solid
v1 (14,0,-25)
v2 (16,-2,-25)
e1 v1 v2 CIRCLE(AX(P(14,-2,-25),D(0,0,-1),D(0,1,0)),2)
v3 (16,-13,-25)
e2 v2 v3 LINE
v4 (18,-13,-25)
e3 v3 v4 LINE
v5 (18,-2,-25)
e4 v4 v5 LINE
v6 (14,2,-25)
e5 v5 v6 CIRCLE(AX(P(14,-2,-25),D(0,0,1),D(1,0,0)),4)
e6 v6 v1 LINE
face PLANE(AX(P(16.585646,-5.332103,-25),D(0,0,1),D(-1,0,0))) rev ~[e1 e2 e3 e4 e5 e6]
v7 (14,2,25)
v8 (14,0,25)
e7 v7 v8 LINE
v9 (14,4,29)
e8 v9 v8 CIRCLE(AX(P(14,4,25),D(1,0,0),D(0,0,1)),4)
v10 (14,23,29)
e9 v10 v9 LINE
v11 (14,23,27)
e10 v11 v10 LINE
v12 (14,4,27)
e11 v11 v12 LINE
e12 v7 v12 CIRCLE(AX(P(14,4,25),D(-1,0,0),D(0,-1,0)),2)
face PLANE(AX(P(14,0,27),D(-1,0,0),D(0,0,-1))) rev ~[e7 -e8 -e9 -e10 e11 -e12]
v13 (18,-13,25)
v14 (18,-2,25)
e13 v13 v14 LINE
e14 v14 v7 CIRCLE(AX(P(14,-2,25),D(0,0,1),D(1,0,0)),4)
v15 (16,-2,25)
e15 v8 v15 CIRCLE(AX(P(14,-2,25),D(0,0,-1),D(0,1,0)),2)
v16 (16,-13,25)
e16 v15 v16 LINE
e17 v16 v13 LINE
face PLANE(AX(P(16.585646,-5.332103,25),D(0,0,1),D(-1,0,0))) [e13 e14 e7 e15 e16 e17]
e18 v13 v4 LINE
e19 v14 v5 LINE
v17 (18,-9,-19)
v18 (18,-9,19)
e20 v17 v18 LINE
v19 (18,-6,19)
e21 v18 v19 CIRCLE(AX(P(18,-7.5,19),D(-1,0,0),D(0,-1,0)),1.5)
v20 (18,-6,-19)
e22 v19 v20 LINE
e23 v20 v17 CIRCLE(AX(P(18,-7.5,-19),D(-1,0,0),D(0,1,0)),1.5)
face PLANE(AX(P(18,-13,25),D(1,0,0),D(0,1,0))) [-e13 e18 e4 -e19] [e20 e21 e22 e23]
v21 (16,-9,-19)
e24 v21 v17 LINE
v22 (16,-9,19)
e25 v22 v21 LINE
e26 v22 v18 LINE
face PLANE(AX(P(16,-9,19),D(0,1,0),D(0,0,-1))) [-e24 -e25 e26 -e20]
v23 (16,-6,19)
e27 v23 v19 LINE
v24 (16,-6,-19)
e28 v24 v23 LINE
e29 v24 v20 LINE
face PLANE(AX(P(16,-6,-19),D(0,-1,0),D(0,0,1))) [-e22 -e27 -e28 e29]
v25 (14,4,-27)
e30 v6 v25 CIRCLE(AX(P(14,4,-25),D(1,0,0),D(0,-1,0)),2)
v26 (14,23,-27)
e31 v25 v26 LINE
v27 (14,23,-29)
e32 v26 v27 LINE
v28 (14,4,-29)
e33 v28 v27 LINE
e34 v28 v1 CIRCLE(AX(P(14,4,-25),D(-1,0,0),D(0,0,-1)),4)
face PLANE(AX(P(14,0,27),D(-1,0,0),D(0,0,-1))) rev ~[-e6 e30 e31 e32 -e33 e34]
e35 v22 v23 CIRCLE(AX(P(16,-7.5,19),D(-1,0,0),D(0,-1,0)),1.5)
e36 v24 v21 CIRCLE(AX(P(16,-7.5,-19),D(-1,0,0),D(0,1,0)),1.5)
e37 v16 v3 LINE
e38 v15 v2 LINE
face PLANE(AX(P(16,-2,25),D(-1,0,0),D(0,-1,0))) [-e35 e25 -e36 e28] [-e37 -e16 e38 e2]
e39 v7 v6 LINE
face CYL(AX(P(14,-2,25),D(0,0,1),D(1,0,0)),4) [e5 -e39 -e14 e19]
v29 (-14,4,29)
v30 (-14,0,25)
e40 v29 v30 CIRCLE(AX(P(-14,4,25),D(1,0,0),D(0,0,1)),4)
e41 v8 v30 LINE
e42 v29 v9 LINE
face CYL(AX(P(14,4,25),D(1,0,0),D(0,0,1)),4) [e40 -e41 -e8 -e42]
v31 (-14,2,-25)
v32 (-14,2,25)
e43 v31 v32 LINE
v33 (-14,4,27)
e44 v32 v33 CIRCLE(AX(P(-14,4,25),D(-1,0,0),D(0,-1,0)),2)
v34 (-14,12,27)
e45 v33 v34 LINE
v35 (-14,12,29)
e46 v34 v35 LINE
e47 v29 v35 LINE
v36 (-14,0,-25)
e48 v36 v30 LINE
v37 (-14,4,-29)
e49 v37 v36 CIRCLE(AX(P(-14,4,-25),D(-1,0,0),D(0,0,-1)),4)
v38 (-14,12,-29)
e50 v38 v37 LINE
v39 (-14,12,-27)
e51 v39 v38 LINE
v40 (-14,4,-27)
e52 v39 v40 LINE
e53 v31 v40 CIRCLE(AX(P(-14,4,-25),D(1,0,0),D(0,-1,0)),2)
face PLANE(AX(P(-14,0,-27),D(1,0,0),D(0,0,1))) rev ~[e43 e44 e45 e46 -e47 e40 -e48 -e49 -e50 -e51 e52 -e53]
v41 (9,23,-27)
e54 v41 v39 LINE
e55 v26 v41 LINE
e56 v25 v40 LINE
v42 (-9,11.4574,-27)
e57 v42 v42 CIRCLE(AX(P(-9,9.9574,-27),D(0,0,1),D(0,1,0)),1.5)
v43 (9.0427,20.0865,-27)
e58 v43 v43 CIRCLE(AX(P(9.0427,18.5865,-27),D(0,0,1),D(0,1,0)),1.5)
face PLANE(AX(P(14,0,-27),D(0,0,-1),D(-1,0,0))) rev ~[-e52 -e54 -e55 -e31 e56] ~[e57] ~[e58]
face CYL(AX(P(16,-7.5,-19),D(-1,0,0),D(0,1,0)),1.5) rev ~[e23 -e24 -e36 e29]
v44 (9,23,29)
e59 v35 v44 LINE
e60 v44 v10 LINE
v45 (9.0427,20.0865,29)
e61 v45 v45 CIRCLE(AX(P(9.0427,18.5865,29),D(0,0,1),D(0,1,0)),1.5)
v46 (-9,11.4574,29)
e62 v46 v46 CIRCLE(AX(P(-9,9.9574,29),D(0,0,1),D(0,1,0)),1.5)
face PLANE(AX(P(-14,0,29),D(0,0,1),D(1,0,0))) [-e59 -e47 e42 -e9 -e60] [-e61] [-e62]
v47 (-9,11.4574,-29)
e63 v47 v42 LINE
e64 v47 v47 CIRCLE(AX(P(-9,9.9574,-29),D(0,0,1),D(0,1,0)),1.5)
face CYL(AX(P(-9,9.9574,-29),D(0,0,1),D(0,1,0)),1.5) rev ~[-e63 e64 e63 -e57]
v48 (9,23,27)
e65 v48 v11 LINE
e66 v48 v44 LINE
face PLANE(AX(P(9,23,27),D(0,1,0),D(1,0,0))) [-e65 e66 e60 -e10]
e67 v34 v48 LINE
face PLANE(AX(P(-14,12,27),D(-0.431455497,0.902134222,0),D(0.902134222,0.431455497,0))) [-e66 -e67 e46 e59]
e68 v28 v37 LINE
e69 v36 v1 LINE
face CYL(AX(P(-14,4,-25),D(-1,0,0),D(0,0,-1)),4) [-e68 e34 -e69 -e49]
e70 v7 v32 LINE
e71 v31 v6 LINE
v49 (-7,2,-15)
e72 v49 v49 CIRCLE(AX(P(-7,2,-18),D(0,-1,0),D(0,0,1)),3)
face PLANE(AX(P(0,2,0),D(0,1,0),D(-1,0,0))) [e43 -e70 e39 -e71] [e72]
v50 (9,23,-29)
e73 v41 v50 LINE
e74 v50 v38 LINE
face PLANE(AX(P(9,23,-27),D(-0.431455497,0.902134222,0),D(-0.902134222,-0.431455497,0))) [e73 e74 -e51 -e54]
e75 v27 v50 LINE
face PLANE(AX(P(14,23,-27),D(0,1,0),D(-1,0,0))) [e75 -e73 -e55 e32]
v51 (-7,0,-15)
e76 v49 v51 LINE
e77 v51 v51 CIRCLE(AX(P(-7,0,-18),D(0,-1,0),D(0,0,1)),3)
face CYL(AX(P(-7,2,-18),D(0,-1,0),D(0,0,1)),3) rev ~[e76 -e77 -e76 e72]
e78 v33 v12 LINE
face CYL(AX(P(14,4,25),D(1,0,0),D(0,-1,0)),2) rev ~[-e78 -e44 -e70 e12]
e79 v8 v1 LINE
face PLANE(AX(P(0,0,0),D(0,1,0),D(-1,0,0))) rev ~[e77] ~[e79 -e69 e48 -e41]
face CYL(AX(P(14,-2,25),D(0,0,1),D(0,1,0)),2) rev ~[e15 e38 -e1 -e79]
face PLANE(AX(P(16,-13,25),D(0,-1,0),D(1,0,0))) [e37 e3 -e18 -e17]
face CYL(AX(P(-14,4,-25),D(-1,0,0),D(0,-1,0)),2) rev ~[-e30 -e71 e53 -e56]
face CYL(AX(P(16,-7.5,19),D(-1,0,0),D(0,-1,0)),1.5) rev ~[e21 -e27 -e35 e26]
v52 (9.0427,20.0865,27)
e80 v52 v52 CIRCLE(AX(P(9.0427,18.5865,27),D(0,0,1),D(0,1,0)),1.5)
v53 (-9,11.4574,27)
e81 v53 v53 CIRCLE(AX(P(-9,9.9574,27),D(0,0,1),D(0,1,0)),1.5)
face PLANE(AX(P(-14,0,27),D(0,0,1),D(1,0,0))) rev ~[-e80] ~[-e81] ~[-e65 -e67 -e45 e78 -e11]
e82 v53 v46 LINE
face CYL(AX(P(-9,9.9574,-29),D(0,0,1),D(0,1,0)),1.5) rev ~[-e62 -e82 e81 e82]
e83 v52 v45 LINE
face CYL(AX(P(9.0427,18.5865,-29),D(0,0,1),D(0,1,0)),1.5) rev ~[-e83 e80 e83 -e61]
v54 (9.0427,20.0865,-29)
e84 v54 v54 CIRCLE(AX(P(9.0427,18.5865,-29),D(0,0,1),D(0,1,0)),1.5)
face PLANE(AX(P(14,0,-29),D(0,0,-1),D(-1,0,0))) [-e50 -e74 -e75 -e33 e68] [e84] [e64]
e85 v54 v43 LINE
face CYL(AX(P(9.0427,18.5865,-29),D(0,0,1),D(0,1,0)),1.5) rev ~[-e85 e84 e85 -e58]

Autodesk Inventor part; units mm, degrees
ref_plane "YZ Plane" through (0, 0, 0) normal (1, 0, 0) x (0, 1, 0)
ref_plane "XZ Plane" through (0, 0, 0) normal (0, 1, 0) x (-1, 0, 0)
ref_plane "XY Plane" through (0, 0, 0) normal (0, 0, 1) x (1, 0, 0)
sketch "スケッチ1" plane through (0, 0, 0) normal (0, 1, 0) x (-1, 0, 0)
  line L0 (-14, -27) -> (14, -27)
  line L1 (14, 27) -> (-14, 27)
  line L2 (-14, 27) -> (-14, -27)
  line L3 (-14, -27) -> (14, 27) construction
  line L4 (14, -27) -> (-14, 27) construction
  line L5 (14, -27) -> (14, 27)
  point P0 (0, 0)
  dimension "d0" = 28
  dimension "d1" = 54
extrude "プレート1" add sketch "スケッチ1" along normal blind 2
sketch "スケッチ2" plane through (-14, 0, 27) normal (0, 0, 1) x (1, 0, 0)
  line L0 (0, 2) -> (28, 2)
  line L1 (0, 2) -> (0, 12)
  line L2 (0, 12) -> (23, 23)
  line L3 (23, 23) -> (28, 23)
  line L4 (28, 23) -> (28, 2)
  line L5 (0, 0) -> (0, 2)
  line L6 (28, 2) -> (0, 2)
  point P0 (14, 0)
  dimension "d3" = 10
  dimension "d4" = 5
  dimension "d5" = 21
sheet face with bend "面2" sketch "スケッチ2" thickness 2 toward (0, 0, 1) bend radius 2
bend "曲げ1"
sketch "スケッチ3" plane through (14, 0, -27) normal (0, 0, -1) x (-1, 0, 0)
  line L0 (0, 0) -> (0, 2)
  line L1 (0, 2) -> (0, 23)
  line L2 (0, 23) -> (5, 23)
  line L3 (0, 23) -> (5, 23)
  line L4 (28, 12) -> (28, 4)
  line L5 (5, 23) -> (28, 12)
  line L6 (28, 0) -> (28, 2)
  line L7 (28, 12) -> (28, 2)
  line L8 (28, 2) -> (0, 2)
  point P0 (14, 0)
sheet face with bend "面3" sketch "スケッチ3" thickness 2 toward (0, 0, -1) bend radius 2
bend "曲げ2"
sketch "スケッチ4" plane through (14, 0, -29) normal (0, 0, -1) x (-1, 0, 0)
  line L0 (5, 23) -> (28, 12) projected
  line L1 (0, 23) -> (5, 23) projected
  line L2 (28, 4) -> (28, 12) projected
  point P0 (14, 0)
  point P1 (4.9573, 18.5865)
  point P2 (23, 9.9574)
  dimension "d16" = 4
  dimension "d17" = 4
  dimension "d18" = 20
  dimension "d44" = 5
hole "穴1" at (9.0427, 18.5865, -29) at (-9, 9.9574, -29) direction (0, 0, 1) diameter 3 end through all
sketch "スケッチ6" plane through (16, -2, -25) normal (1, 0, 0) x (0, -1, 0)
  line L0 (0, 50) -> (0, 0)
  line L1 (0, 0) -> (11, 0)
  line L2 (11, 0) -> (11, 50)
  line L3 (11, 50) -> (0, 50)
edge flange "フランジ1" height 15 angle 90 thickness 2 bend radius 2 thickness toward (1, 0, 0) relief straight relief width 2 relief depth 1 edges at (14, 2, 0) wall of the first edge with corners at (16, -2, 25) (16, -2, -25) (16, -13, -25) (16, -13, 25)
bend "曲げ3"
corner "コーナー1"
sketch "スケッチ8" plane through (16, -13, -25) normal (-1, 0, 0) x (0, 0, 1)
  line L0 (44, 4) -> (6, 4)
  arc A0 (6, 7) -> (6, 4) centre (6, 5.5) ccw
  line L1 (6, 7) -> (44, 7)
  arc A1 (44, 4) -> (44, 7) centre (44, 5.5) ccw
  line L2 (50, 11) -> (50, 0) projected
  line L3 (0, 0) -> (0, 11) projected
  line L4 (50, 0) -> (0, 0) projected
  point P0 (25, 13)
  point P1 (50, 5.5)
  dimension "d66" = 6
  dimension "d67" = 6
  dimension "d69" = 1.5
extrude "押し出し2" cut sketch "スケッチ8" against normal blind 10
sketch "スケッチ9" plane through (0, 2, 0) normal (0, 1, 0) x (1, 0, 0)
  line L0 (14, 25) -> (-14, 25) projected
  line L1 (-14, -25) -> (-14, 25) projected
  point P0 (0, 0)
  point P1 (-7, 18)
  dimension "d72" = 7
  dimension "d73" = 7
hole "穴3" at (-7, 2, -18) direction (0, -1, 0) diameter 6 end through all
equation "\"d25\" = Thickness"
equation "\"d79\" = Thickness"
equation "\"d2\" = Thickness"
equation "\"d6\" = BendRadius"
equation "\"d7\" = BendReliefWidth"
equation "\"d9\" = MinimumRemnant"
equation "\"d8\" = BendReliefDepth"
equation "\"d10\" = TransitionRadius"
equation "\"d11\" = BendRadius"
equation "\"d12\" = BendReliefWidth"
equation "\"d14\" = MinimumRemnant"
equation "\"d13\" = BendReliefDepth"
equation "\"d15\" = TransitionRadius"
equation "\"d45\" = BendReliefWidth"
equation "\"d46\" = BendReliefDepth"
equation "\"d47\" = MinimumRemnant"
equation "\"d48\" = TransitionRadius"
equation "\"d51\" = BendRadius"
equation "\"d52\" = CornerReliefSize"
equation "\"d53\" = GapSize"
equation "\"d54\" = JacobiRadiusSize"
equation "\"BendRadius\" = Thickness"
equation "\"BendReliefWidth\" = Thickness"
equation "\"BendReliefDepth\" = 0.5 * Thickness"
equation "\"CornerReliefSize\" = 4 * Thickness"
equation "\"MinimumRemnant\" = 2 * Thickness"
equation "\"TransitionRadius\" = BendRadius"
equation "\"JacobiRadiusSize\" = Thickness"
equation "\"GapSize\" = Thickness"
equation "\"Thickness\" = 2"
properties part number "trackball_l" material "アルミニウム 6061"
